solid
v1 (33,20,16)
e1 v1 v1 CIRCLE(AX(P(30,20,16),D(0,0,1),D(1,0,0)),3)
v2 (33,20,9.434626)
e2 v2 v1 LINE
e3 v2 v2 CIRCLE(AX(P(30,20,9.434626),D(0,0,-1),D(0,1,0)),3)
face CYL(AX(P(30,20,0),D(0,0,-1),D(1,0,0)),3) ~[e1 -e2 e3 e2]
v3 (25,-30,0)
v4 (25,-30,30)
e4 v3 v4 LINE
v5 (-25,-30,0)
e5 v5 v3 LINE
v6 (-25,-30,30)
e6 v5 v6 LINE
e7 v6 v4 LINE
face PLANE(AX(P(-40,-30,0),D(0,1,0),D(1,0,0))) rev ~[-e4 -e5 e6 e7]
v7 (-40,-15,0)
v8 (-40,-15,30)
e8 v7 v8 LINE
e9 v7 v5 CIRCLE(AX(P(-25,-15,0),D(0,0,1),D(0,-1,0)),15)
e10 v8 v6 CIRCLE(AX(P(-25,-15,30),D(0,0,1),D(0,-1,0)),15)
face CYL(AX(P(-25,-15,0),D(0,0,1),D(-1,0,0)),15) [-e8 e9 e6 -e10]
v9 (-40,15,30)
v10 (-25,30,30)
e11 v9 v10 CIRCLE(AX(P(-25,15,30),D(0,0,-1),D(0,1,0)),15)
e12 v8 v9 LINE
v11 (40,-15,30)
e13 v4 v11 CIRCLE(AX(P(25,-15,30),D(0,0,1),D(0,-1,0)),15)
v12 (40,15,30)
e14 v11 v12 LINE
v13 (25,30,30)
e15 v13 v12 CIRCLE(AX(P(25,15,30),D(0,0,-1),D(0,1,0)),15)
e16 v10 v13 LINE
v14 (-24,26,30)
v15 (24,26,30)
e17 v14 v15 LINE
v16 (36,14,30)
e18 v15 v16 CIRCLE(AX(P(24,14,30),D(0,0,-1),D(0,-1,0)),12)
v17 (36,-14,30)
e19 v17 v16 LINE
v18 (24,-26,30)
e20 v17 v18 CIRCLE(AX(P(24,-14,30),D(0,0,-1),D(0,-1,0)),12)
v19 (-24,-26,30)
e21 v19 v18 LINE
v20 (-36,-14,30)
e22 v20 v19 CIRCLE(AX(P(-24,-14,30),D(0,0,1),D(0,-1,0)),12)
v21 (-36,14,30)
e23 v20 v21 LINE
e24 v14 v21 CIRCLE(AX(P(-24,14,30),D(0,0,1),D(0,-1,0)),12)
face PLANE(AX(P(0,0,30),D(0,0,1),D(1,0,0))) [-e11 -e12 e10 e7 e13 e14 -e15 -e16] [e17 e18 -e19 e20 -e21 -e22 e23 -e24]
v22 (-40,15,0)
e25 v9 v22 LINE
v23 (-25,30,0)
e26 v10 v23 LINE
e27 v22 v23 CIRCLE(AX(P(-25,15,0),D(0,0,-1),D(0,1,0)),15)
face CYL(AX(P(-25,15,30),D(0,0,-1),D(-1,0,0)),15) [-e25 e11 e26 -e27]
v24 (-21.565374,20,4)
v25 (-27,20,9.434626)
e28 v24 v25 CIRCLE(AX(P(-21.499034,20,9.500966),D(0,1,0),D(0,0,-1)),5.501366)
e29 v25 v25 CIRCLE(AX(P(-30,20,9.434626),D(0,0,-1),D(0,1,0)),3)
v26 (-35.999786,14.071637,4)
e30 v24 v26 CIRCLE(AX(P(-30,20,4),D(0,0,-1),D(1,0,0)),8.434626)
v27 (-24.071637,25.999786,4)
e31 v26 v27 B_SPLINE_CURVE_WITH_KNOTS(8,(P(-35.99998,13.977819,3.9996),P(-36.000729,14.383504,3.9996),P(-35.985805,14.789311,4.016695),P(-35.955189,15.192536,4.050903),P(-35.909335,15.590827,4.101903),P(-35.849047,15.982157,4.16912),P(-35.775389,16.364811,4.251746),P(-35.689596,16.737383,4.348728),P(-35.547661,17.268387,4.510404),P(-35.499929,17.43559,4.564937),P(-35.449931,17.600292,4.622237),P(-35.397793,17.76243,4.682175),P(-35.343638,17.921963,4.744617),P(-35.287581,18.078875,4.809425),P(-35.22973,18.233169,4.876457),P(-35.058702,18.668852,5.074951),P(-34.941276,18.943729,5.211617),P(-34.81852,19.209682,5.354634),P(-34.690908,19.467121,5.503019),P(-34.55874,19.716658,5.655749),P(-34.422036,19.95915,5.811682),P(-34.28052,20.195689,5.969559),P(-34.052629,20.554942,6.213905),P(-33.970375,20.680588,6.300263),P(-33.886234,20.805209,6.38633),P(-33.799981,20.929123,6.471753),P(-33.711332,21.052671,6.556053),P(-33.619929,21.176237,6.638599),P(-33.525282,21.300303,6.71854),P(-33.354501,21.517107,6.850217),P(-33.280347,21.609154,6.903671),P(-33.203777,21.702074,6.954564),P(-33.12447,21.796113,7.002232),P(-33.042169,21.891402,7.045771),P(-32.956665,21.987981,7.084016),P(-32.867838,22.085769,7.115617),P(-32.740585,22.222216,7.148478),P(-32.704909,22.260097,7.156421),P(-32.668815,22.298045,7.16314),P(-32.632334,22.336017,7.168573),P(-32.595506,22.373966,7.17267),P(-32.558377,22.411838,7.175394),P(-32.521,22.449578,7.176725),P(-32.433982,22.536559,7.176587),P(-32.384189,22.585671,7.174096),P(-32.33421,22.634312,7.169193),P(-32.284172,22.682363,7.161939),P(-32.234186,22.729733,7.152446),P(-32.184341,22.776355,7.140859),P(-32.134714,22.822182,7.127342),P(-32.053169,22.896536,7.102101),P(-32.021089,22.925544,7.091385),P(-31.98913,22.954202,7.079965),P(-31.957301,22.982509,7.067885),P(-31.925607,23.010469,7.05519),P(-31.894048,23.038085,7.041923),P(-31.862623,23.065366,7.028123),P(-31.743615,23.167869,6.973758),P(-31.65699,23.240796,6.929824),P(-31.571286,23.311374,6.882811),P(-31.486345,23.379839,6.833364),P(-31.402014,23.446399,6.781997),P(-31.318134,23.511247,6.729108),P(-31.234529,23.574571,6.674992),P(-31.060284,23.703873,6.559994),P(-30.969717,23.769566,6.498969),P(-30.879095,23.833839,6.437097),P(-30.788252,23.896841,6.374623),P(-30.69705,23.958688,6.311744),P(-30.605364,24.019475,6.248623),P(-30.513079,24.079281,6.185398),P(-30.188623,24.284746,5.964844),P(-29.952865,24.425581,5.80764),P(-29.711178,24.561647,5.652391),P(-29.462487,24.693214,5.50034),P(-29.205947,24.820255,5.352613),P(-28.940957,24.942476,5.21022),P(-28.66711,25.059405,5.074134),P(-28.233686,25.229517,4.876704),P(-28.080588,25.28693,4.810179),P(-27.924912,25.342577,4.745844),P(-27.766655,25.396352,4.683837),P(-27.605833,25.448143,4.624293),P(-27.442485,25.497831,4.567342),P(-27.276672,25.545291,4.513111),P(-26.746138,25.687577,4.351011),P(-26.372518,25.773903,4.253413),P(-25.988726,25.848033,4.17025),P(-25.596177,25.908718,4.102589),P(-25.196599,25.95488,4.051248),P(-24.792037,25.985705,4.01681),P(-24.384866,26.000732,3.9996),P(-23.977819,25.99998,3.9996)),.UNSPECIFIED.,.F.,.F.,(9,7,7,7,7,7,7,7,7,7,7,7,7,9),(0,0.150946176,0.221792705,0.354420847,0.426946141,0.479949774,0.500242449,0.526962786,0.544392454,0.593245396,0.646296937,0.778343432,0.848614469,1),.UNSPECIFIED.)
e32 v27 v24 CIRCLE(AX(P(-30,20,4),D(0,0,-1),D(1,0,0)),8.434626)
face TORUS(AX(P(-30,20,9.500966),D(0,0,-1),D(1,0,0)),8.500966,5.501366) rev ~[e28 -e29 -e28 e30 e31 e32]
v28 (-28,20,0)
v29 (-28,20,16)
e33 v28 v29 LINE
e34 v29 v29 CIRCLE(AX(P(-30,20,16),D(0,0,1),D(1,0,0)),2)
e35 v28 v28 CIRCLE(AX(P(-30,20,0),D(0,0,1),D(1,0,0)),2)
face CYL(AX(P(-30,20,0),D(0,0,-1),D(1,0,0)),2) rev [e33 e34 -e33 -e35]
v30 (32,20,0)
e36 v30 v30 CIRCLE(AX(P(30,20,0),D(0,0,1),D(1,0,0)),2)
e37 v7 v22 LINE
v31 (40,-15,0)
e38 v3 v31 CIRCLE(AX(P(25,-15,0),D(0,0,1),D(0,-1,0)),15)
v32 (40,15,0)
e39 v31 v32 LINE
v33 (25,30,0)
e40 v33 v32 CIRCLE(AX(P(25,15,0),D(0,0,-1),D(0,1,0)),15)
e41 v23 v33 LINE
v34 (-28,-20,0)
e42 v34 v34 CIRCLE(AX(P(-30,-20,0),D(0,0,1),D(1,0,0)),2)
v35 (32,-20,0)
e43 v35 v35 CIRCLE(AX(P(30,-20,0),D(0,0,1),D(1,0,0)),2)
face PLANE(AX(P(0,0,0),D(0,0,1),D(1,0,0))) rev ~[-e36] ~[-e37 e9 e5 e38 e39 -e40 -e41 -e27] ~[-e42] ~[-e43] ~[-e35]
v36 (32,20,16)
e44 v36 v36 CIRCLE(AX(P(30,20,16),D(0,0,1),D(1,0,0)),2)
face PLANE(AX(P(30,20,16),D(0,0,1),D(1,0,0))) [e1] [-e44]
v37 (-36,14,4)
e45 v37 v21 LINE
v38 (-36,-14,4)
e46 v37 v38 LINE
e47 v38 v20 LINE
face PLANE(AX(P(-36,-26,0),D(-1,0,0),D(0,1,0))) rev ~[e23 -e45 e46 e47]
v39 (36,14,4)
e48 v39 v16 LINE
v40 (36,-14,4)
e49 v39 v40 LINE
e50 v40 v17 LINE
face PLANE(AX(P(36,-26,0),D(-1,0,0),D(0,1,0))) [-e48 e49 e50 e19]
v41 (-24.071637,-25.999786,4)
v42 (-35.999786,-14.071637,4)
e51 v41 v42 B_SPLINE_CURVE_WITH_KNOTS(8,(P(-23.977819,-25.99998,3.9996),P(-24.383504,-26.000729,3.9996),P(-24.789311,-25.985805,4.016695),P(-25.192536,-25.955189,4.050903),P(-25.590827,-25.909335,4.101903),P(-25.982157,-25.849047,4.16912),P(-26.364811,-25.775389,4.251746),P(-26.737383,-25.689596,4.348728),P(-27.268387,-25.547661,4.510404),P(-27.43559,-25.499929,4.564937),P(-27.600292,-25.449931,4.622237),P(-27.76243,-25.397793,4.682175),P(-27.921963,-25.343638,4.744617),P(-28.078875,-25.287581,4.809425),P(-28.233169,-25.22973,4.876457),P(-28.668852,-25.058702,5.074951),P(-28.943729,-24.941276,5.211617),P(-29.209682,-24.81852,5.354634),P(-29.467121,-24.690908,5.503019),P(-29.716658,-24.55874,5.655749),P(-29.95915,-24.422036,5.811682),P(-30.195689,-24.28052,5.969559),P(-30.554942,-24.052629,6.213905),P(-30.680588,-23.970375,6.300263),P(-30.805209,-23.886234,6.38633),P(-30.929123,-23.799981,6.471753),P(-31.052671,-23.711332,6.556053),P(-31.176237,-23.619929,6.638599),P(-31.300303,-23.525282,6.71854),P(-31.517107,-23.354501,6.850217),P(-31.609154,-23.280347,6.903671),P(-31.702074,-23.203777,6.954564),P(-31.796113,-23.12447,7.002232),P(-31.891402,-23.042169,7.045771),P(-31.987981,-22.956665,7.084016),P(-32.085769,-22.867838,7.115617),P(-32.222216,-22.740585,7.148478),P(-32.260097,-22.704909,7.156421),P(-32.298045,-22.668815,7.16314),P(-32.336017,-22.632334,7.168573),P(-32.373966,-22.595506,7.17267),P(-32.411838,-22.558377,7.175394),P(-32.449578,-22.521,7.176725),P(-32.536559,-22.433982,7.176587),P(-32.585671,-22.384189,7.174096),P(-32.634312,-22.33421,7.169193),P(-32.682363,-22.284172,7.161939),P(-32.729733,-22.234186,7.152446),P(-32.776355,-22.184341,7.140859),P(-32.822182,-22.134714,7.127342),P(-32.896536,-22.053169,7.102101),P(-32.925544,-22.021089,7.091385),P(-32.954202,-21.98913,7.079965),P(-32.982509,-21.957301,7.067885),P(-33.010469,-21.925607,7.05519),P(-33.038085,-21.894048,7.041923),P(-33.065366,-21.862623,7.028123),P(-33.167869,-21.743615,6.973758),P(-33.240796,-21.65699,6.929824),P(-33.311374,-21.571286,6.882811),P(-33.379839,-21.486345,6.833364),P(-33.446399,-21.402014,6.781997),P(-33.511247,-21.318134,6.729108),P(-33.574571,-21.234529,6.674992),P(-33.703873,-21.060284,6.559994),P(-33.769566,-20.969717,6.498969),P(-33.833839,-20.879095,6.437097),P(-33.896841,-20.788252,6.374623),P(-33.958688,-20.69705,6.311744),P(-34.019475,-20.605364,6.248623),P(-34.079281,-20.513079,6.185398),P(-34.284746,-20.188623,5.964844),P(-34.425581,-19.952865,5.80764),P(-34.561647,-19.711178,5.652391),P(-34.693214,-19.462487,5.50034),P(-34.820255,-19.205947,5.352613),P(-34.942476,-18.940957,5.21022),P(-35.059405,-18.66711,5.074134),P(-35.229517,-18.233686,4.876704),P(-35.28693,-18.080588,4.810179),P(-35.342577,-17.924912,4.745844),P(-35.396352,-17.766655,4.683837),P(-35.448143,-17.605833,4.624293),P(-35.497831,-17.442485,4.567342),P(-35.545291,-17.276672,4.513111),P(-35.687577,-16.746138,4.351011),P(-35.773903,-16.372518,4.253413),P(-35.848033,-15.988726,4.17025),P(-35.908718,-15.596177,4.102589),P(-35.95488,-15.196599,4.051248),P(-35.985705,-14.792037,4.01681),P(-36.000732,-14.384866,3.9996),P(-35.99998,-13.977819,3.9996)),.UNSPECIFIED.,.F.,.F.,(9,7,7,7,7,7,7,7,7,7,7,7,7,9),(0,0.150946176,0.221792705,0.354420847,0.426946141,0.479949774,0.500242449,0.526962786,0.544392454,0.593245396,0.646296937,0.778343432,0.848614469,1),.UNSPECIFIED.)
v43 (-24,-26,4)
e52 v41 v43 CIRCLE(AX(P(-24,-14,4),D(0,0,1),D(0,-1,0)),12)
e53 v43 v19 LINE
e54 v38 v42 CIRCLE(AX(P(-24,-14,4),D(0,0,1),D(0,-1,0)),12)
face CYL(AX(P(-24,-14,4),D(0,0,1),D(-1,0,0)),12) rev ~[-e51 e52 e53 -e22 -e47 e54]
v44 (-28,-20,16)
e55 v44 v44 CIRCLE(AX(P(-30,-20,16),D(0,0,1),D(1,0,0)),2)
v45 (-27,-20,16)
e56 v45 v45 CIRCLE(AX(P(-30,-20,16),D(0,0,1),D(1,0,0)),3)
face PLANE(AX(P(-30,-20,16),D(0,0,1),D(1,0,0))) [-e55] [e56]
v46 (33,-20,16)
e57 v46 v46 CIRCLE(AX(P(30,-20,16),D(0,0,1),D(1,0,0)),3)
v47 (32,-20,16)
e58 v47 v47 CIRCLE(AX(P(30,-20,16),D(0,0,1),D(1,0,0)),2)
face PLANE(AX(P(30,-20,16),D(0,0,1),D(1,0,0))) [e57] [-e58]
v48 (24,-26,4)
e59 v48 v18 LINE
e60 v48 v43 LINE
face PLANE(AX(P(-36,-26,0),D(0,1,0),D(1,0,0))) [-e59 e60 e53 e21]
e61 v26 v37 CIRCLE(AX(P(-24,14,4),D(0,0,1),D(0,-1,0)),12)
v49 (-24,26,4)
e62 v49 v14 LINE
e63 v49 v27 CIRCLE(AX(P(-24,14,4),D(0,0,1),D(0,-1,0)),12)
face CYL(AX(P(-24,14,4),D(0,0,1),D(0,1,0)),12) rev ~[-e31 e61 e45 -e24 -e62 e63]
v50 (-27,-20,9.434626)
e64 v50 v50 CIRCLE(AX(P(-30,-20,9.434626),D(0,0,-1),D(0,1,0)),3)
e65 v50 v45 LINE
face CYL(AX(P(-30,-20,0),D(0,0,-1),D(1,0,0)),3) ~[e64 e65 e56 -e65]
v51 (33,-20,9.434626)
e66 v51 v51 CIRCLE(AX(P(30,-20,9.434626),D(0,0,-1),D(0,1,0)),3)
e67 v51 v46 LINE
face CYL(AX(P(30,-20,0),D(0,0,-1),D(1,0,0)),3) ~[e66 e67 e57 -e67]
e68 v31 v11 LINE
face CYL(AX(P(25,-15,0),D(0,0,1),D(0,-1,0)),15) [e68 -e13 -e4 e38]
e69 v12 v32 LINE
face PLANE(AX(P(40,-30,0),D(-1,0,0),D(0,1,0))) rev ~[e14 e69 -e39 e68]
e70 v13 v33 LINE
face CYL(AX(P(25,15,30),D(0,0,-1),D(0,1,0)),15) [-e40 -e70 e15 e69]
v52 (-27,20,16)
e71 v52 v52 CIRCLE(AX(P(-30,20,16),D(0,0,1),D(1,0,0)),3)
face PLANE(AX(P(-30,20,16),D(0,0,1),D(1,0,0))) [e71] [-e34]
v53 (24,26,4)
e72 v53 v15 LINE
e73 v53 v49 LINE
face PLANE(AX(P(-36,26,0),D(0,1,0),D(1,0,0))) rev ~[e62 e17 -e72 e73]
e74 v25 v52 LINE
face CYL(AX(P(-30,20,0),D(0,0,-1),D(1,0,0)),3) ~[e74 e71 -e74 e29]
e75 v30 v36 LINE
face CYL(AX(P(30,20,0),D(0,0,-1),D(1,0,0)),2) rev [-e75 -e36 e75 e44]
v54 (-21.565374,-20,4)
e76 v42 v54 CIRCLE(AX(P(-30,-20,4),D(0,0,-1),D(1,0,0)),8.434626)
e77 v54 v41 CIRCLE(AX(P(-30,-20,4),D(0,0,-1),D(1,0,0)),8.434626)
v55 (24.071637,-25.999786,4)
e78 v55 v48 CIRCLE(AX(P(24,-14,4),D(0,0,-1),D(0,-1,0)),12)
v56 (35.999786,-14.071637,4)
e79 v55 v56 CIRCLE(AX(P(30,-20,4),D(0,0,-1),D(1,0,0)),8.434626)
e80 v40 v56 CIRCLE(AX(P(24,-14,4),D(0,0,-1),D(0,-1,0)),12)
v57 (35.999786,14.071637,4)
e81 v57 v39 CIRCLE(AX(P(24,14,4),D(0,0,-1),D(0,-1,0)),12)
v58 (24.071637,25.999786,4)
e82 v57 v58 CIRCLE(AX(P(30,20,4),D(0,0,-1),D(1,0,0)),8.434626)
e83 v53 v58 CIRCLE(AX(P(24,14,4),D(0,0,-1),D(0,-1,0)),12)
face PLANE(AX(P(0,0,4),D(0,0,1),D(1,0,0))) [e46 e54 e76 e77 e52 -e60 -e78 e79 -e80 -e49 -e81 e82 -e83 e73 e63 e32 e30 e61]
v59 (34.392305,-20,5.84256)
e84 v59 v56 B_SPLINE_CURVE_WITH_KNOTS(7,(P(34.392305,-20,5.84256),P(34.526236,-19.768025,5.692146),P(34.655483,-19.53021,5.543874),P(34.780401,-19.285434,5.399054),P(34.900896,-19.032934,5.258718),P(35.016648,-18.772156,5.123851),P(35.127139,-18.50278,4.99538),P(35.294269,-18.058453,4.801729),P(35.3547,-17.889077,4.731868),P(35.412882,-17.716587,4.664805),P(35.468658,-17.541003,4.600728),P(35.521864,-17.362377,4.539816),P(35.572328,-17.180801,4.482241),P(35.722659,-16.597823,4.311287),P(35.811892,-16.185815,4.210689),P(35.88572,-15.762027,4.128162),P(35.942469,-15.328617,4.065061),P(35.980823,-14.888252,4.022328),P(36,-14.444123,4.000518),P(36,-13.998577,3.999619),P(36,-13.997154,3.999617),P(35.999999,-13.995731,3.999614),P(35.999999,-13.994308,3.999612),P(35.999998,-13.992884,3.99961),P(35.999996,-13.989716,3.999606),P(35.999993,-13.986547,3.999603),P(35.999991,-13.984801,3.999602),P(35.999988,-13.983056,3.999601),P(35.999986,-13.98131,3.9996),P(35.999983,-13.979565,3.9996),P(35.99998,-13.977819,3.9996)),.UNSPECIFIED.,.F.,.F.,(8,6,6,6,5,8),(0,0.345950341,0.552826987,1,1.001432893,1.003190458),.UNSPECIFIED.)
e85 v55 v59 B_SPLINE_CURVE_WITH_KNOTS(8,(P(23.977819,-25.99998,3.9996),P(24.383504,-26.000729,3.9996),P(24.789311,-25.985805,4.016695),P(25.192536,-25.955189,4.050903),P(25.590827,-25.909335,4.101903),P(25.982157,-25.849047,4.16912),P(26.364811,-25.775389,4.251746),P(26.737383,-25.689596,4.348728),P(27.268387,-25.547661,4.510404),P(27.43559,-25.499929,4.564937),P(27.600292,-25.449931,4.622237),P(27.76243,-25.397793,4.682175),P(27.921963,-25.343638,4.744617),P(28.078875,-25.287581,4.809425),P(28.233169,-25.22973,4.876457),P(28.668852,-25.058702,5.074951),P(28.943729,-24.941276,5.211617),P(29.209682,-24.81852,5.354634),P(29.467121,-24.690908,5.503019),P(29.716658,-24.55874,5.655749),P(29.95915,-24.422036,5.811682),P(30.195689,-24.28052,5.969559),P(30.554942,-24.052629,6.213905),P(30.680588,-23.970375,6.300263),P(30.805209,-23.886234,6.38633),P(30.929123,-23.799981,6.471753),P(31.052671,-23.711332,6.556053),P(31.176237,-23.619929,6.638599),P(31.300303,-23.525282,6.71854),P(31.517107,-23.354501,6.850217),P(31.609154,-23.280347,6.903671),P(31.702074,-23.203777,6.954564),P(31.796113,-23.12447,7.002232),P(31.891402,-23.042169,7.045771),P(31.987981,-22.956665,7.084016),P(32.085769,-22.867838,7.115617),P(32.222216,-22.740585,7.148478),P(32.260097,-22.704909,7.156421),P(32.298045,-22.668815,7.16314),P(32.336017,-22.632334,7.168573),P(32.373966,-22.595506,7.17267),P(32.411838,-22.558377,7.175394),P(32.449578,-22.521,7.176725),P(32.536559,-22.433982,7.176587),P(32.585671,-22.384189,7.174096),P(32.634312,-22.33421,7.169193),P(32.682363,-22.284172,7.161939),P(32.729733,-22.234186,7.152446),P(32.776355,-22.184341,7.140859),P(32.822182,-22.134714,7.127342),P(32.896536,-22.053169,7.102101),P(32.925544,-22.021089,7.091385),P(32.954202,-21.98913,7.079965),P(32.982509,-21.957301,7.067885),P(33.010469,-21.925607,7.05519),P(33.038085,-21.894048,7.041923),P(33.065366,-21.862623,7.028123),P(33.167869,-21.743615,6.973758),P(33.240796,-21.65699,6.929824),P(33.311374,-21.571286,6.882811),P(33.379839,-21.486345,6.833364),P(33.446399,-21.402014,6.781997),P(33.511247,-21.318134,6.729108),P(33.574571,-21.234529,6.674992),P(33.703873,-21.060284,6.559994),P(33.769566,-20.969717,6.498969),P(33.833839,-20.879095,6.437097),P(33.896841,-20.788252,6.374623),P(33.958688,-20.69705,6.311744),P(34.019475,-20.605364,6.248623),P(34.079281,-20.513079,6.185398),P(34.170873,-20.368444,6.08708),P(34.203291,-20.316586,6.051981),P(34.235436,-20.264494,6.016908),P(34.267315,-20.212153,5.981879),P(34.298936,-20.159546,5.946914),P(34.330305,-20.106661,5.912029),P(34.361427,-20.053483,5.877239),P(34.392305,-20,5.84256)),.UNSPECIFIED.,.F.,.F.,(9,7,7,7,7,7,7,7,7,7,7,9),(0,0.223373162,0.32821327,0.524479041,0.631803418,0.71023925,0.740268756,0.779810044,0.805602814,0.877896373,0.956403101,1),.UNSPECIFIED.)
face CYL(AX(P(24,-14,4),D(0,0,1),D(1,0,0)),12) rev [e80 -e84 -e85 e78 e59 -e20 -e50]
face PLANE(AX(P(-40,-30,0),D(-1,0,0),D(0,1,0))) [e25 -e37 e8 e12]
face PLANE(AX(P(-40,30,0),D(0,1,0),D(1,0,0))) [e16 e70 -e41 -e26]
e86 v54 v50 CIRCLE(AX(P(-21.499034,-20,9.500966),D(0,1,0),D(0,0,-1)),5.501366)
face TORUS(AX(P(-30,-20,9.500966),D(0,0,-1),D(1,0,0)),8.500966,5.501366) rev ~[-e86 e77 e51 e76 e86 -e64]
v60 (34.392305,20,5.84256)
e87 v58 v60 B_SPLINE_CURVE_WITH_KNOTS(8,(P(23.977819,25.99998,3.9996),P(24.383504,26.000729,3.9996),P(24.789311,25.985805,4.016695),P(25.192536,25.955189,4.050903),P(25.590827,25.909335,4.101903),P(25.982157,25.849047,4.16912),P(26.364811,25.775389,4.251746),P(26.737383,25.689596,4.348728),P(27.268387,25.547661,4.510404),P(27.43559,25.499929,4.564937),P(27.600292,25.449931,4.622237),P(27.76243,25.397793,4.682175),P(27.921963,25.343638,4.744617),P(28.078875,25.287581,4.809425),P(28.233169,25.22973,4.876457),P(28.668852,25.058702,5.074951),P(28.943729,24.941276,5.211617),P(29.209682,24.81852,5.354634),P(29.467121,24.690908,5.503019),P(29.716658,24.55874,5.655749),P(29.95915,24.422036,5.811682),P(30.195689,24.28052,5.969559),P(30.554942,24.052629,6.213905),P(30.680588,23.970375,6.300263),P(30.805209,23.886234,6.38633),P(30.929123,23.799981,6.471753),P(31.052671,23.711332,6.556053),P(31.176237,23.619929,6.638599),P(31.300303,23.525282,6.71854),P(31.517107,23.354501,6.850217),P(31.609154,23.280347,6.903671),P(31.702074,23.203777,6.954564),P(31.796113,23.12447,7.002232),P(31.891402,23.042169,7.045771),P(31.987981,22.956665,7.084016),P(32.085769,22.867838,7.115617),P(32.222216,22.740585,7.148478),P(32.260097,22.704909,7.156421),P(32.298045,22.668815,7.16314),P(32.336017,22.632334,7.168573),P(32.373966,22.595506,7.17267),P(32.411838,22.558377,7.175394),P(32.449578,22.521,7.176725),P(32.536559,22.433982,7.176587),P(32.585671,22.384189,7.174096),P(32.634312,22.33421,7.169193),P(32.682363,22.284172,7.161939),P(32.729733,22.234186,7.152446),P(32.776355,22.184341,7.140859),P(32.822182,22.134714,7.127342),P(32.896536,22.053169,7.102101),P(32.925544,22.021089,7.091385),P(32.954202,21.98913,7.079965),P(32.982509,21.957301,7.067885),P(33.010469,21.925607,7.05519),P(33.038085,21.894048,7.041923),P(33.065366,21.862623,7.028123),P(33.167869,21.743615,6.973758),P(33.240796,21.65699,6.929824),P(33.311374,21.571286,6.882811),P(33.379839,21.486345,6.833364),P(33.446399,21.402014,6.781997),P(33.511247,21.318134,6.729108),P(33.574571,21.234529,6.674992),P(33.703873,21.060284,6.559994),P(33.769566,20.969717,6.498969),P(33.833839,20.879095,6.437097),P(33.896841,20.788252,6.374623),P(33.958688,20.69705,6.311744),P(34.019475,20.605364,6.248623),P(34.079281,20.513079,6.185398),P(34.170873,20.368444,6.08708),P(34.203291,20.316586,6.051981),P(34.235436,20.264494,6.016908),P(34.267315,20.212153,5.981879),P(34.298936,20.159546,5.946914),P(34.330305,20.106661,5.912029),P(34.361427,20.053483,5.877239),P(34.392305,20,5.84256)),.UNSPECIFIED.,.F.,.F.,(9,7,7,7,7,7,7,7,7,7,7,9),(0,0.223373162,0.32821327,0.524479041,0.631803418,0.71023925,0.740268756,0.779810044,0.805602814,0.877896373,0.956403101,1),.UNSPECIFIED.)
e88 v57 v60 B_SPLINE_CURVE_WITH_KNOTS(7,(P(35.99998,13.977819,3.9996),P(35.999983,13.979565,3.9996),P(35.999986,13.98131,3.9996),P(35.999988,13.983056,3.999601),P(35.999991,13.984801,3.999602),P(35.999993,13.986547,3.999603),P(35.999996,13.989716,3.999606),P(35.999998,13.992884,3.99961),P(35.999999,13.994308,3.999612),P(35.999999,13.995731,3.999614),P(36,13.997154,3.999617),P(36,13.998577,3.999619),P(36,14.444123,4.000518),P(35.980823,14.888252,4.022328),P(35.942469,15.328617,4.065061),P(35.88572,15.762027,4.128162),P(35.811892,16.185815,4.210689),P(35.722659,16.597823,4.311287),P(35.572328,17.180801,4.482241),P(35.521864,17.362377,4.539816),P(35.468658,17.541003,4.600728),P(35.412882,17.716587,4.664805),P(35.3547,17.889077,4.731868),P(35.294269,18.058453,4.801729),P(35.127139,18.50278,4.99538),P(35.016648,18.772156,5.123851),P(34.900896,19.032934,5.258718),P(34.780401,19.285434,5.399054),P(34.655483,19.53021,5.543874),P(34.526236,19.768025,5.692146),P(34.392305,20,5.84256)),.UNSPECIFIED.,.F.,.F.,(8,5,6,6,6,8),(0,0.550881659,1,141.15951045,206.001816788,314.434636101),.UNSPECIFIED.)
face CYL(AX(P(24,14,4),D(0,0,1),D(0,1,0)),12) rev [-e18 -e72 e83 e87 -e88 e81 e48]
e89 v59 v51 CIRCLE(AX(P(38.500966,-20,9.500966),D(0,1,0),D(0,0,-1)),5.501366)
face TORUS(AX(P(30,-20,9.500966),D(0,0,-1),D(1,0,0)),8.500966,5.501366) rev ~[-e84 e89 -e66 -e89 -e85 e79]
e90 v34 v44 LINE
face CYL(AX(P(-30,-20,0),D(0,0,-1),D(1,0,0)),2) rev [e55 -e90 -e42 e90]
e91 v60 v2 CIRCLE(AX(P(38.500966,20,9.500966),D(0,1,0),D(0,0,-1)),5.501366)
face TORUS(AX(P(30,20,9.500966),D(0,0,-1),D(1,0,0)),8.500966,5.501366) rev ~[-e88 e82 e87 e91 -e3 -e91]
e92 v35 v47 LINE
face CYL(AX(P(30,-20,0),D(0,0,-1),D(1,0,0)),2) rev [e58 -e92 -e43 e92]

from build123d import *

# Parameters (mm, degrees)
F0_W         = 80
F0_H         = 60
F0_W_2       = 72
F0_H_2       = 52
F0_R         = 3
F0_R_2       = 2
F1_DEPTH     = 4
F2_DEPTH     = 30
F3_DEPTH     = 16
F5_R         = 12
F6_R         = 15
F7_S5_R      = 12
F7_T6_DEPTH  = 15
F7_S11_R     = 12
F7_T12_DEPTH = 15
F7_S17_R     = 12
F7_T18_DEPTH = 15
F7_S23_R     = 12
F7_T24_DEPTH = 15


# Not quite as in the source:
# - a fillet or chamfer that OpenCascade refuses, or shapes differently, is made with other operations: its cross-section is extruded or revolved along the edge and cut away or added


with BuildPart() as f1:
    # F0 (on Top) → F1 (new body)
    with BuildSketch(Plane.XY):
        Rectangle(F0_W, F0_H)
        Rectangle(F0_W_2, F0_H_2, mode=Mode.SUBTRACT)
        Rectangle(F0_W_2, F0_H_2)
        with Locations((-30, -20)):
            Circle(F0_R, mode=Mode.SUBTRACT)
        with Locations((30, -20)):
            Circle(F0_R, mode=Mode.SUBTRACT)
        with Locations((-30, 20)):
            Circle(F0_R, mode=Mode.SUBTRACT)
        with Locations((30, 20)):
            Circle(F0_R, mode=Mode.SUBTRACT)
        with Locations((-30, 20)):
            Circle(F0_R)
        with Locations((-30, 20)):
            Circle(F0_R_2, mode=Mode.SUBTRACT)
        with Locations((30, 20)):
            Circle(F0_R)
        with Locations((30, 20)):
            Circle(F0_R_2, mode=Mode.SUBTRACT)
        with Locations((30, -20)):
            Circle(F0_R)
        with Locations((30, -20)):
            Circle(F0_R_2, mode=Mode.SUBTRACT)
        with Locations((-30, -20)):
            Circle(F0_R)
        with Locations((-30, -20)):
            Circle(F0_R_2, mode=Mode.SUBTRACT)
    extrude(amount=F1_DEPTH)

    # F0 (on Top) → F2 (join)
    with BuildSketch(Plane.XY):
        Rectangle(F0_W, F0_H)
        Rectangle(F0_W_2, F0_H_2, mode=Mode.SUBTRACT)
    extrude(amount=F2_DEPTH)

    # F0 (on Top) → F3 (join)
    with BuildSketch(Plane.XY):
        with Locations((-30, 20)):
            Circle(F0_R)
        with Locations((-30, 20)):
            Circle(F0_R_2, mode=Mode.SUBTRACT)
        with Locations((-30, -20)):
            Circle(F0_R)
        with Locations((-30, -20)):
            Circle(F0_R_2, mode=Mode.SUBTRACT)
        with Locations((30, 20)):
            Circle(F0_R)
        with Locations((30, 20)):
            Circle(F0_R_2, mode=Mode.SUBTRACT)
        with Locations((30, -20)):
            Circle(F0_R)
        with Locations((30, -20)):
            Circle(F0_R_2, mode=Mode.SUBTRACT)
    extrude(amount=F3_DEPTH)

    # F4: union 

    # F5
    f5_edges = [f1.edges().sort_by_distance(p)[0] for p in [
        (-36, 26, 17),
        (36, 26, 17),
        (-36, -26, 17),
        (36, -26, 17),
    ]]
    fillet(f5_edges, radius=F5_R)

    # F6
    f6_edges = [f1.edges().sort_by_distance(p)[0] for p in [
        (40, -30, 15),
        (-40, -30, 15),
        (40, 30, 15),
        (-40, 30, 15),
    ]]
    fillet(f6_edges, radius=F6_R)

    # F7: fillet of radius 5.5 on 4 edges, made by hand


with BuildPart() as f7_tool2:
    # F7_s3 → F7_t4 (revolve)
    with BuildSketch(Plane.XZ.offset(-20)):
        with BuildLine():
            ThreePointArc((-21.4990343146, 3.9996), (-25.3890872965, 5.6109127035), (-27.0004, 9.5009656854))
            Line((-27.0004, 9.5009656854), (-27.5505365685, 9.5009656854))
            ThreePointArc((-27.5505365685, 9.5009656854), (-27.5501365685, 6.7504828427), (-27.5501365685, 4))
            Line((-27.5501365685, 4), (-27, 3.4498634315))
            ThreePointArc((-27, 3.4498634315), (-24.2495171573, 3.4498634315), (-21.4990343146, 3.4494634315))
            Line((-21.4990343146, 3.4494634315), (-21.4990343146, 3.9996))
        make_face()
    revolve(axis=Axis((-30, 20, 4), (0, 0, -1)))

    # F7_s5 → F7_t6 (intersect, symmetric)
    with BuildSketch(Plane.XY.offset(8.4)):
        with Locations((-24, 14)):
            Circle(F7_S5_R)
    extrude(amount=F7_T6_DEPTH, both=True, mode=Mode.INTERSECT)


with BuildPart() as f1_1:
    add(f1.part)

    # F7_t1: union F7_tool2
    add(f7_tool2.part)


with BuildPart() as f7_tool8:
    # F7_s9 → F7_t10 (revolve)
    with BuildSketch(Plane.XZ.offset(20)):
        with BuildLine():
            ThreePointArc((-21.4990343146, 3.9996), (-25.3890872965, 5.6109127035), (-27.0004, 9.5009656854))
            Line((-27.0004, 9.5009656854), (-27.5505365685, 9.5009656854))
            ThreePointArc((-27.5505365685, 9.5009656854), (-27.5501365685, 6.7504828427), (-27.5501365685, 4))
            Line((-27.5501365685, 4), (-27, 3.4498634315))
            ThreePointArc((-27, 3.4498634315), (-24.2495171573, 3.4498634315), (-21.4990343146, 3.4494634315))
            Line((-21.4990343146, 3.4494634315), (-21.4990343146, 3.9996))
        make_face()
    revolve(axis=Axis((-30, -20, 4), (0, 0, -1)))

    # F7_s11 → F7_t12 (intersect, symmetric)
    with BuildSketch(Plane.XY.offset(8.4)):
        with Locations((-24, -14)):
            Circle(F7_S11_R)
    extrude(amount=F7_T12_DEPTH, both=True, mode=Mode.INTERSECT)


with BuildPart() as f1_2:
    add(f1_1.part)

    # F7_t7: union F7_tool8
    add(f7_tool8.part)


with BuildPart() as f7_tool14:
    # F7_s15 → F7_t16 (revolve)
    with BuildSketch(Plane.XZ.offset(-20)):
        with BuildLine():
            ThreePointArc((38.5009656854, 3.9996), (34.6109127035, 5.6109127035), (32.9996, 9.5009656854))
            Line((32.9996, 9.5009656854), (32.4494634315, 9.5009656854))
            ThreePointArc((32.4494634315, 9.5009656854), (32.4498634315, 6.7504828427), (32.4498634315, 4))
            Line((32.4498634315, 4), (33, 3.4498634315))
            ThreePointArc((33, 3.4498634315), (35.7504828427, 3.4498634315), (38.5009656854, 3.4494634315))
            Line((38.5009656854, 3.4494634315), (38.5009656854, 3.9996))
        make_face()
    revolve(axis=Axis((30, 20, 4), (0, 0, -1)))

    # F7_s17 → F7_t18 (intersect, symmetric)
    with BuildSketch(Plane.XY.offset(8.4)):
        with Locations((24, 14)):
            Circle(F7_S17_R)
    extrude(amount=F7_T18_DEPTH, both=True, mode=Mode.INTERSECT)


with BuildPart() as f1_3:
    add(f1_2.part)

    # F7_t13: union F7_tool14
    add(f7_tool14.part)


with BuildPart() as f7_tool20:
    # F7_s21 → F7_t22 (revolve)
    with BuildSketch(Plane.XZ.offset(20)):
        with BuildLine():
            ThreePointArc((38.5009656854, 3.9996), (34.6109127035, 5.6109127035), (32.9996, 9.5009656854))
            Line((32.9996, 9.5009656854), (32.4494634315, 9.5009656854))
            ThreePointArc((32.4494634315, 9.5009656854), (32.4498634315, 6.7504828427), (32.4498634315, 4))
            Line((32.4498634315, 4), (33, 3.4498634315))
            ThreePointArc((33, 3.4498634315), (35.7504828427, 3.4498634315), (38.5009656854, 3.4494634315))
            Line((38.5009656854, 3.4494634315), (38.5009656854, 3.9996))
        make_face()
    revolve(axis=Axis((30, -20, 4), (0, 0, -1)))

    # F7_s23 → F7_t24 (intersect, symmetric)
    with BuildSketch(Plane.XY.offset(8.4)):
        with Locations((24, -14)):
            Circle(F7_S23_R)
    extrude(amount=F7_T24_DEPTH, both=True, mode=Mode.INTERSECT)


with BuildPart() as f1_4:
    add(f1_3.part)

    # F7_t19: union F7_tool20
    add(f7_tool20.part)


solid = f1_4.part
